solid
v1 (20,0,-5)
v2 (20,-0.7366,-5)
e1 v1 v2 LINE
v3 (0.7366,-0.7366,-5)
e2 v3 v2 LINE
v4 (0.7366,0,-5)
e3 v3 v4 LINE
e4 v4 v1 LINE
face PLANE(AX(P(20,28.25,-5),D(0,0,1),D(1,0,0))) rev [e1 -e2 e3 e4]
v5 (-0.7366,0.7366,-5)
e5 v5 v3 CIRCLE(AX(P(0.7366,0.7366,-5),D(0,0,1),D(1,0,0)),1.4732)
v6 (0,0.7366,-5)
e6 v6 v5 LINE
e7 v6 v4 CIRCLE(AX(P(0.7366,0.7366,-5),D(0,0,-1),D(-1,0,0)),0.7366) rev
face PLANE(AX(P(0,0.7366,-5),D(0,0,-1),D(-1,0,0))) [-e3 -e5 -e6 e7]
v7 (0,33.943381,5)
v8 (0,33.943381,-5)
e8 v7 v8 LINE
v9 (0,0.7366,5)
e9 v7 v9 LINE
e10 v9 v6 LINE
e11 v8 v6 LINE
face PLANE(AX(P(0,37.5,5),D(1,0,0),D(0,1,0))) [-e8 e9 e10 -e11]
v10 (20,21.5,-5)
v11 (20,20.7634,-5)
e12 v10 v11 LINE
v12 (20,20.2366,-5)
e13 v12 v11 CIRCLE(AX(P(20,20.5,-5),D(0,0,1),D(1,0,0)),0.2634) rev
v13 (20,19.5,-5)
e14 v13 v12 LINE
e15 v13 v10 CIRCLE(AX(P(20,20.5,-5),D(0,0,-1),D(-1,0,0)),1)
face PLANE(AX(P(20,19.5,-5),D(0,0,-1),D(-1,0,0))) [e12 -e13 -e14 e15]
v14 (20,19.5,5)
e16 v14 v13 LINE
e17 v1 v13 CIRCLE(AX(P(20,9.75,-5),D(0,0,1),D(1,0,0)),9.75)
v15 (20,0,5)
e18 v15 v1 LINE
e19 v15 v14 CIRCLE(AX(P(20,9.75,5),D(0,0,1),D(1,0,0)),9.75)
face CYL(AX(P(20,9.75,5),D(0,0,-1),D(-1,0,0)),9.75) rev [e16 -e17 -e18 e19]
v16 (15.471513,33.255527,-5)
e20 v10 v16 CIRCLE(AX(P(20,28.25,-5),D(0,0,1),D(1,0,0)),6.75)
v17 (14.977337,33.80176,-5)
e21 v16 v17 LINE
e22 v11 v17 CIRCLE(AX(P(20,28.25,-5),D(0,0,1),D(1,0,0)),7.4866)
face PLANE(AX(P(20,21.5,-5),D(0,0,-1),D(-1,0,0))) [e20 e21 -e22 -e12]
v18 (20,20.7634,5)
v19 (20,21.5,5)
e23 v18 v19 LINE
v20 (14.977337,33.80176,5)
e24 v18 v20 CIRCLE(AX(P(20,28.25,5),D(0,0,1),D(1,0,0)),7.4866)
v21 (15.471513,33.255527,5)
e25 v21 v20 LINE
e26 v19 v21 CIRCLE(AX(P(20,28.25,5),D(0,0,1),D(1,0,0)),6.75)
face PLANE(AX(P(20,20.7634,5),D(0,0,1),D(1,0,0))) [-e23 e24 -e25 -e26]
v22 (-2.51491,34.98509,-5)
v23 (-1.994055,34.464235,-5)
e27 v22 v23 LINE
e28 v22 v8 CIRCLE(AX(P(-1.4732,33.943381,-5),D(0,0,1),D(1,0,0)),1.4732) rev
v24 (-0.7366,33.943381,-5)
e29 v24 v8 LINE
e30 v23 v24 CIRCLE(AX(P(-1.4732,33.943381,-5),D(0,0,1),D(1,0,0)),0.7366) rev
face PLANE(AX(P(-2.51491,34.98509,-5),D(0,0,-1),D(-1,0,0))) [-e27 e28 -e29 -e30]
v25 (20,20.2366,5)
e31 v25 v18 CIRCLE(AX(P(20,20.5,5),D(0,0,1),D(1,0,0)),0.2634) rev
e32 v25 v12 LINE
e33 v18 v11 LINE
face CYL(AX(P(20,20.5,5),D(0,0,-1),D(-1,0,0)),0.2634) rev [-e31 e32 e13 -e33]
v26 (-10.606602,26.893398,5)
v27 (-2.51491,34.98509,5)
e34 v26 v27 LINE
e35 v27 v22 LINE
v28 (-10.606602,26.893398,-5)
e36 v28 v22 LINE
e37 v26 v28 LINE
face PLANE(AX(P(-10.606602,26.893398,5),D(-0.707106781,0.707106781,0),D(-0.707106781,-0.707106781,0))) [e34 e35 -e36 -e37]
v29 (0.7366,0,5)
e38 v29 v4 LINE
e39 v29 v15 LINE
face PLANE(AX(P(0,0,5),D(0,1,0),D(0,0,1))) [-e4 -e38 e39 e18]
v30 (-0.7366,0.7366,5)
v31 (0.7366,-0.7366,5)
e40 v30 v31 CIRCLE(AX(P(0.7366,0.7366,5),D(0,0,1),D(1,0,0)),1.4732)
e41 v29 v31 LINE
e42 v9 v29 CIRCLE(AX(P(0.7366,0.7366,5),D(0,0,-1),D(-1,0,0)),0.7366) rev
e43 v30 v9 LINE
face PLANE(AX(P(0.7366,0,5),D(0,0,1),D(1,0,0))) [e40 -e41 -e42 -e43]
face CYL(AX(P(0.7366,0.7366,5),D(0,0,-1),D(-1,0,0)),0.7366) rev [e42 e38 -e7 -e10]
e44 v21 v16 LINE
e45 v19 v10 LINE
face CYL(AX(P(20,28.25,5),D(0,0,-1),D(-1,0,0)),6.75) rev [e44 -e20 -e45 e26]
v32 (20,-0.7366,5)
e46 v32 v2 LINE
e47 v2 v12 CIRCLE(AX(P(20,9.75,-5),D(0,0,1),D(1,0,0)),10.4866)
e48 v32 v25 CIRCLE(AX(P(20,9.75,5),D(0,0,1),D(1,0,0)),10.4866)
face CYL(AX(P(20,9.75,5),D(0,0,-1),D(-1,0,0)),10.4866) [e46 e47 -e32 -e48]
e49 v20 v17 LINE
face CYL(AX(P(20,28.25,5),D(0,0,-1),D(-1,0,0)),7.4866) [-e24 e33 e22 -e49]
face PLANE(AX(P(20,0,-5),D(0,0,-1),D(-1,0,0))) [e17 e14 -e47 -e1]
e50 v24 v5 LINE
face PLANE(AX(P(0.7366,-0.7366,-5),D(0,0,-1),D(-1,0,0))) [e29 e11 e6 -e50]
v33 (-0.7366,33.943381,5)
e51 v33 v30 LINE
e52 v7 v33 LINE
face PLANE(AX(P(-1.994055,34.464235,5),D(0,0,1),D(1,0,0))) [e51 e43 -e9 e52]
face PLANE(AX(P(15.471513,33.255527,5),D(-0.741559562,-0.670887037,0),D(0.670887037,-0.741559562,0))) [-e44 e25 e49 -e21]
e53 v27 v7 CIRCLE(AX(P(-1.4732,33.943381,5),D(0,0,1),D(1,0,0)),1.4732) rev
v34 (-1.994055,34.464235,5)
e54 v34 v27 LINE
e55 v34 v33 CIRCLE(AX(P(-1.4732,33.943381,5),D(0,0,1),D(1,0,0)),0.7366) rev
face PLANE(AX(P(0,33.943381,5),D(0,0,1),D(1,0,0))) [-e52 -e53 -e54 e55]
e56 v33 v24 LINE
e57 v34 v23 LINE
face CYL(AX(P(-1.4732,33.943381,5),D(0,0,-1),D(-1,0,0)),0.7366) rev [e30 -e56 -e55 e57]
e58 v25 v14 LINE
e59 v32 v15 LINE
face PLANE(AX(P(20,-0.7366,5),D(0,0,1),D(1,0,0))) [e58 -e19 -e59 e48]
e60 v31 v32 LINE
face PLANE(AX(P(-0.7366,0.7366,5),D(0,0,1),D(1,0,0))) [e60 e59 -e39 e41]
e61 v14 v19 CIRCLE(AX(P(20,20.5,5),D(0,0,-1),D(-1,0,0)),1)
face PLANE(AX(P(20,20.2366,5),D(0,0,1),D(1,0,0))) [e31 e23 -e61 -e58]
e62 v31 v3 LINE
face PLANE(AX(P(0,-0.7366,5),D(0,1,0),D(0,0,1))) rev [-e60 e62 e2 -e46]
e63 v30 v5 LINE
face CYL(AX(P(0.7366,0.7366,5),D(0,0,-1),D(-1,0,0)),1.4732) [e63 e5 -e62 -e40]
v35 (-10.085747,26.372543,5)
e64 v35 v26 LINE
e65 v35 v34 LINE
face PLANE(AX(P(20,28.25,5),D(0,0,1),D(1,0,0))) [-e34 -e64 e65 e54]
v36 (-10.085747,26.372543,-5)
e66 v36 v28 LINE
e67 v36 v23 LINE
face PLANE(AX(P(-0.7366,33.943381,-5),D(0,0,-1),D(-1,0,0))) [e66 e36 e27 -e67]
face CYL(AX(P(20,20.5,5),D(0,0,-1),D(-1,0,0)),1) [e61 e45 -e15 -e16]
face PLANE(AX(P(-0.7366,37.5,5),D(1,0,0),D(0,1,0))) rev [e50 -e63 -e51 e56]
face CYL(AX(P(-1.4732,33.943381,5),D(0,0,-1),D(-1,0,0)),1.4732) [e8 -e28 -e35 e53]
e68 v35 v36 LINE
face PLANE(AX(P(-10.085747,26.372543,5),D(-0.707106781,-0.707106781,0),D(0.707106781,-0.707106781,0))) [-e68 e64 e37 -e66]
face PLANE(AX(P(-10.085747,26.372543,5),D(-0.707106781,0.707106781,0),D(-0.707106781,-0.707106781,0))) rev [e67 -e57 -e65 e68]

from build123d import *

# Parameters (mm, degrees)
BASE_FLANGE1_DEPTH = 5


# Sheet-metal steps are written as plain solids
with BuildPart() as part:
    # Sketch1 → Base-Flange1 (new, symmetric)
    with BuildSketch(Plane.XY):
        with BuildLine():
            Line((-10.606601718, 26.893398282), (-2.51490971, 34.98509029))
            ThreePointArc((-2.51490971, 34.98509029), (-0.909430767, 35.304439907), (0, 33.94338058))
            Line((0, 33.94338058), (0, 0.7366))
            ThreePointArc((0, 0.7366), (0.215745145, 0.215745145), (0.7366, 0))
            Line((0.7366, 0), (20, 0))
            ThreePointArc((20, 0), (29.75, 9.75), (20, 19.5))
            ThreePointArc((20, 19.5), (19, 20.5), (20, 21.5))
            ThreePointArc((20, 21.5), (26.298801772, 30.676436942), (15.471512501, 33.255527043))
            Line((15.471512501, 33.255527043), (14.97733711, 33.801759816))
            ThreePointArc((14.97733711, 33.801759816), (26.986164348, 30.94122412), (20, 20.7634))
            ThreePointArc((20, 20.7634), (19.7366, 20.5), (20, 20.2366))
            ThreePointArc((20, 20.2366), (30.4866, 9.75), (20, -0.7366))
            Line((20, -0.7366), (0.7366, -0.7366))
            ThreePointArc((0.7366, -0.7366), (-0.30510971, -0.30510971), (-0.7366, 0.7366))
            Line((-0.7366, 0.7366), (-0.7366, 33.94338058))
            ThreePointArc((-0.7366, 33.94338058), (-1.191315384, 34.623910244), (-1.994054855, 34.464235435))
            Line((-1.994054855, 34.464235435), (-10.085746863, 26.372543427))
            Line((-10.085746863, 26.372543427), (-10.606601718, 26.893398282))
        make_face()
    extrude(amount=BASE_FLANGE1_DEPTH, both=True)


solid = part.part
